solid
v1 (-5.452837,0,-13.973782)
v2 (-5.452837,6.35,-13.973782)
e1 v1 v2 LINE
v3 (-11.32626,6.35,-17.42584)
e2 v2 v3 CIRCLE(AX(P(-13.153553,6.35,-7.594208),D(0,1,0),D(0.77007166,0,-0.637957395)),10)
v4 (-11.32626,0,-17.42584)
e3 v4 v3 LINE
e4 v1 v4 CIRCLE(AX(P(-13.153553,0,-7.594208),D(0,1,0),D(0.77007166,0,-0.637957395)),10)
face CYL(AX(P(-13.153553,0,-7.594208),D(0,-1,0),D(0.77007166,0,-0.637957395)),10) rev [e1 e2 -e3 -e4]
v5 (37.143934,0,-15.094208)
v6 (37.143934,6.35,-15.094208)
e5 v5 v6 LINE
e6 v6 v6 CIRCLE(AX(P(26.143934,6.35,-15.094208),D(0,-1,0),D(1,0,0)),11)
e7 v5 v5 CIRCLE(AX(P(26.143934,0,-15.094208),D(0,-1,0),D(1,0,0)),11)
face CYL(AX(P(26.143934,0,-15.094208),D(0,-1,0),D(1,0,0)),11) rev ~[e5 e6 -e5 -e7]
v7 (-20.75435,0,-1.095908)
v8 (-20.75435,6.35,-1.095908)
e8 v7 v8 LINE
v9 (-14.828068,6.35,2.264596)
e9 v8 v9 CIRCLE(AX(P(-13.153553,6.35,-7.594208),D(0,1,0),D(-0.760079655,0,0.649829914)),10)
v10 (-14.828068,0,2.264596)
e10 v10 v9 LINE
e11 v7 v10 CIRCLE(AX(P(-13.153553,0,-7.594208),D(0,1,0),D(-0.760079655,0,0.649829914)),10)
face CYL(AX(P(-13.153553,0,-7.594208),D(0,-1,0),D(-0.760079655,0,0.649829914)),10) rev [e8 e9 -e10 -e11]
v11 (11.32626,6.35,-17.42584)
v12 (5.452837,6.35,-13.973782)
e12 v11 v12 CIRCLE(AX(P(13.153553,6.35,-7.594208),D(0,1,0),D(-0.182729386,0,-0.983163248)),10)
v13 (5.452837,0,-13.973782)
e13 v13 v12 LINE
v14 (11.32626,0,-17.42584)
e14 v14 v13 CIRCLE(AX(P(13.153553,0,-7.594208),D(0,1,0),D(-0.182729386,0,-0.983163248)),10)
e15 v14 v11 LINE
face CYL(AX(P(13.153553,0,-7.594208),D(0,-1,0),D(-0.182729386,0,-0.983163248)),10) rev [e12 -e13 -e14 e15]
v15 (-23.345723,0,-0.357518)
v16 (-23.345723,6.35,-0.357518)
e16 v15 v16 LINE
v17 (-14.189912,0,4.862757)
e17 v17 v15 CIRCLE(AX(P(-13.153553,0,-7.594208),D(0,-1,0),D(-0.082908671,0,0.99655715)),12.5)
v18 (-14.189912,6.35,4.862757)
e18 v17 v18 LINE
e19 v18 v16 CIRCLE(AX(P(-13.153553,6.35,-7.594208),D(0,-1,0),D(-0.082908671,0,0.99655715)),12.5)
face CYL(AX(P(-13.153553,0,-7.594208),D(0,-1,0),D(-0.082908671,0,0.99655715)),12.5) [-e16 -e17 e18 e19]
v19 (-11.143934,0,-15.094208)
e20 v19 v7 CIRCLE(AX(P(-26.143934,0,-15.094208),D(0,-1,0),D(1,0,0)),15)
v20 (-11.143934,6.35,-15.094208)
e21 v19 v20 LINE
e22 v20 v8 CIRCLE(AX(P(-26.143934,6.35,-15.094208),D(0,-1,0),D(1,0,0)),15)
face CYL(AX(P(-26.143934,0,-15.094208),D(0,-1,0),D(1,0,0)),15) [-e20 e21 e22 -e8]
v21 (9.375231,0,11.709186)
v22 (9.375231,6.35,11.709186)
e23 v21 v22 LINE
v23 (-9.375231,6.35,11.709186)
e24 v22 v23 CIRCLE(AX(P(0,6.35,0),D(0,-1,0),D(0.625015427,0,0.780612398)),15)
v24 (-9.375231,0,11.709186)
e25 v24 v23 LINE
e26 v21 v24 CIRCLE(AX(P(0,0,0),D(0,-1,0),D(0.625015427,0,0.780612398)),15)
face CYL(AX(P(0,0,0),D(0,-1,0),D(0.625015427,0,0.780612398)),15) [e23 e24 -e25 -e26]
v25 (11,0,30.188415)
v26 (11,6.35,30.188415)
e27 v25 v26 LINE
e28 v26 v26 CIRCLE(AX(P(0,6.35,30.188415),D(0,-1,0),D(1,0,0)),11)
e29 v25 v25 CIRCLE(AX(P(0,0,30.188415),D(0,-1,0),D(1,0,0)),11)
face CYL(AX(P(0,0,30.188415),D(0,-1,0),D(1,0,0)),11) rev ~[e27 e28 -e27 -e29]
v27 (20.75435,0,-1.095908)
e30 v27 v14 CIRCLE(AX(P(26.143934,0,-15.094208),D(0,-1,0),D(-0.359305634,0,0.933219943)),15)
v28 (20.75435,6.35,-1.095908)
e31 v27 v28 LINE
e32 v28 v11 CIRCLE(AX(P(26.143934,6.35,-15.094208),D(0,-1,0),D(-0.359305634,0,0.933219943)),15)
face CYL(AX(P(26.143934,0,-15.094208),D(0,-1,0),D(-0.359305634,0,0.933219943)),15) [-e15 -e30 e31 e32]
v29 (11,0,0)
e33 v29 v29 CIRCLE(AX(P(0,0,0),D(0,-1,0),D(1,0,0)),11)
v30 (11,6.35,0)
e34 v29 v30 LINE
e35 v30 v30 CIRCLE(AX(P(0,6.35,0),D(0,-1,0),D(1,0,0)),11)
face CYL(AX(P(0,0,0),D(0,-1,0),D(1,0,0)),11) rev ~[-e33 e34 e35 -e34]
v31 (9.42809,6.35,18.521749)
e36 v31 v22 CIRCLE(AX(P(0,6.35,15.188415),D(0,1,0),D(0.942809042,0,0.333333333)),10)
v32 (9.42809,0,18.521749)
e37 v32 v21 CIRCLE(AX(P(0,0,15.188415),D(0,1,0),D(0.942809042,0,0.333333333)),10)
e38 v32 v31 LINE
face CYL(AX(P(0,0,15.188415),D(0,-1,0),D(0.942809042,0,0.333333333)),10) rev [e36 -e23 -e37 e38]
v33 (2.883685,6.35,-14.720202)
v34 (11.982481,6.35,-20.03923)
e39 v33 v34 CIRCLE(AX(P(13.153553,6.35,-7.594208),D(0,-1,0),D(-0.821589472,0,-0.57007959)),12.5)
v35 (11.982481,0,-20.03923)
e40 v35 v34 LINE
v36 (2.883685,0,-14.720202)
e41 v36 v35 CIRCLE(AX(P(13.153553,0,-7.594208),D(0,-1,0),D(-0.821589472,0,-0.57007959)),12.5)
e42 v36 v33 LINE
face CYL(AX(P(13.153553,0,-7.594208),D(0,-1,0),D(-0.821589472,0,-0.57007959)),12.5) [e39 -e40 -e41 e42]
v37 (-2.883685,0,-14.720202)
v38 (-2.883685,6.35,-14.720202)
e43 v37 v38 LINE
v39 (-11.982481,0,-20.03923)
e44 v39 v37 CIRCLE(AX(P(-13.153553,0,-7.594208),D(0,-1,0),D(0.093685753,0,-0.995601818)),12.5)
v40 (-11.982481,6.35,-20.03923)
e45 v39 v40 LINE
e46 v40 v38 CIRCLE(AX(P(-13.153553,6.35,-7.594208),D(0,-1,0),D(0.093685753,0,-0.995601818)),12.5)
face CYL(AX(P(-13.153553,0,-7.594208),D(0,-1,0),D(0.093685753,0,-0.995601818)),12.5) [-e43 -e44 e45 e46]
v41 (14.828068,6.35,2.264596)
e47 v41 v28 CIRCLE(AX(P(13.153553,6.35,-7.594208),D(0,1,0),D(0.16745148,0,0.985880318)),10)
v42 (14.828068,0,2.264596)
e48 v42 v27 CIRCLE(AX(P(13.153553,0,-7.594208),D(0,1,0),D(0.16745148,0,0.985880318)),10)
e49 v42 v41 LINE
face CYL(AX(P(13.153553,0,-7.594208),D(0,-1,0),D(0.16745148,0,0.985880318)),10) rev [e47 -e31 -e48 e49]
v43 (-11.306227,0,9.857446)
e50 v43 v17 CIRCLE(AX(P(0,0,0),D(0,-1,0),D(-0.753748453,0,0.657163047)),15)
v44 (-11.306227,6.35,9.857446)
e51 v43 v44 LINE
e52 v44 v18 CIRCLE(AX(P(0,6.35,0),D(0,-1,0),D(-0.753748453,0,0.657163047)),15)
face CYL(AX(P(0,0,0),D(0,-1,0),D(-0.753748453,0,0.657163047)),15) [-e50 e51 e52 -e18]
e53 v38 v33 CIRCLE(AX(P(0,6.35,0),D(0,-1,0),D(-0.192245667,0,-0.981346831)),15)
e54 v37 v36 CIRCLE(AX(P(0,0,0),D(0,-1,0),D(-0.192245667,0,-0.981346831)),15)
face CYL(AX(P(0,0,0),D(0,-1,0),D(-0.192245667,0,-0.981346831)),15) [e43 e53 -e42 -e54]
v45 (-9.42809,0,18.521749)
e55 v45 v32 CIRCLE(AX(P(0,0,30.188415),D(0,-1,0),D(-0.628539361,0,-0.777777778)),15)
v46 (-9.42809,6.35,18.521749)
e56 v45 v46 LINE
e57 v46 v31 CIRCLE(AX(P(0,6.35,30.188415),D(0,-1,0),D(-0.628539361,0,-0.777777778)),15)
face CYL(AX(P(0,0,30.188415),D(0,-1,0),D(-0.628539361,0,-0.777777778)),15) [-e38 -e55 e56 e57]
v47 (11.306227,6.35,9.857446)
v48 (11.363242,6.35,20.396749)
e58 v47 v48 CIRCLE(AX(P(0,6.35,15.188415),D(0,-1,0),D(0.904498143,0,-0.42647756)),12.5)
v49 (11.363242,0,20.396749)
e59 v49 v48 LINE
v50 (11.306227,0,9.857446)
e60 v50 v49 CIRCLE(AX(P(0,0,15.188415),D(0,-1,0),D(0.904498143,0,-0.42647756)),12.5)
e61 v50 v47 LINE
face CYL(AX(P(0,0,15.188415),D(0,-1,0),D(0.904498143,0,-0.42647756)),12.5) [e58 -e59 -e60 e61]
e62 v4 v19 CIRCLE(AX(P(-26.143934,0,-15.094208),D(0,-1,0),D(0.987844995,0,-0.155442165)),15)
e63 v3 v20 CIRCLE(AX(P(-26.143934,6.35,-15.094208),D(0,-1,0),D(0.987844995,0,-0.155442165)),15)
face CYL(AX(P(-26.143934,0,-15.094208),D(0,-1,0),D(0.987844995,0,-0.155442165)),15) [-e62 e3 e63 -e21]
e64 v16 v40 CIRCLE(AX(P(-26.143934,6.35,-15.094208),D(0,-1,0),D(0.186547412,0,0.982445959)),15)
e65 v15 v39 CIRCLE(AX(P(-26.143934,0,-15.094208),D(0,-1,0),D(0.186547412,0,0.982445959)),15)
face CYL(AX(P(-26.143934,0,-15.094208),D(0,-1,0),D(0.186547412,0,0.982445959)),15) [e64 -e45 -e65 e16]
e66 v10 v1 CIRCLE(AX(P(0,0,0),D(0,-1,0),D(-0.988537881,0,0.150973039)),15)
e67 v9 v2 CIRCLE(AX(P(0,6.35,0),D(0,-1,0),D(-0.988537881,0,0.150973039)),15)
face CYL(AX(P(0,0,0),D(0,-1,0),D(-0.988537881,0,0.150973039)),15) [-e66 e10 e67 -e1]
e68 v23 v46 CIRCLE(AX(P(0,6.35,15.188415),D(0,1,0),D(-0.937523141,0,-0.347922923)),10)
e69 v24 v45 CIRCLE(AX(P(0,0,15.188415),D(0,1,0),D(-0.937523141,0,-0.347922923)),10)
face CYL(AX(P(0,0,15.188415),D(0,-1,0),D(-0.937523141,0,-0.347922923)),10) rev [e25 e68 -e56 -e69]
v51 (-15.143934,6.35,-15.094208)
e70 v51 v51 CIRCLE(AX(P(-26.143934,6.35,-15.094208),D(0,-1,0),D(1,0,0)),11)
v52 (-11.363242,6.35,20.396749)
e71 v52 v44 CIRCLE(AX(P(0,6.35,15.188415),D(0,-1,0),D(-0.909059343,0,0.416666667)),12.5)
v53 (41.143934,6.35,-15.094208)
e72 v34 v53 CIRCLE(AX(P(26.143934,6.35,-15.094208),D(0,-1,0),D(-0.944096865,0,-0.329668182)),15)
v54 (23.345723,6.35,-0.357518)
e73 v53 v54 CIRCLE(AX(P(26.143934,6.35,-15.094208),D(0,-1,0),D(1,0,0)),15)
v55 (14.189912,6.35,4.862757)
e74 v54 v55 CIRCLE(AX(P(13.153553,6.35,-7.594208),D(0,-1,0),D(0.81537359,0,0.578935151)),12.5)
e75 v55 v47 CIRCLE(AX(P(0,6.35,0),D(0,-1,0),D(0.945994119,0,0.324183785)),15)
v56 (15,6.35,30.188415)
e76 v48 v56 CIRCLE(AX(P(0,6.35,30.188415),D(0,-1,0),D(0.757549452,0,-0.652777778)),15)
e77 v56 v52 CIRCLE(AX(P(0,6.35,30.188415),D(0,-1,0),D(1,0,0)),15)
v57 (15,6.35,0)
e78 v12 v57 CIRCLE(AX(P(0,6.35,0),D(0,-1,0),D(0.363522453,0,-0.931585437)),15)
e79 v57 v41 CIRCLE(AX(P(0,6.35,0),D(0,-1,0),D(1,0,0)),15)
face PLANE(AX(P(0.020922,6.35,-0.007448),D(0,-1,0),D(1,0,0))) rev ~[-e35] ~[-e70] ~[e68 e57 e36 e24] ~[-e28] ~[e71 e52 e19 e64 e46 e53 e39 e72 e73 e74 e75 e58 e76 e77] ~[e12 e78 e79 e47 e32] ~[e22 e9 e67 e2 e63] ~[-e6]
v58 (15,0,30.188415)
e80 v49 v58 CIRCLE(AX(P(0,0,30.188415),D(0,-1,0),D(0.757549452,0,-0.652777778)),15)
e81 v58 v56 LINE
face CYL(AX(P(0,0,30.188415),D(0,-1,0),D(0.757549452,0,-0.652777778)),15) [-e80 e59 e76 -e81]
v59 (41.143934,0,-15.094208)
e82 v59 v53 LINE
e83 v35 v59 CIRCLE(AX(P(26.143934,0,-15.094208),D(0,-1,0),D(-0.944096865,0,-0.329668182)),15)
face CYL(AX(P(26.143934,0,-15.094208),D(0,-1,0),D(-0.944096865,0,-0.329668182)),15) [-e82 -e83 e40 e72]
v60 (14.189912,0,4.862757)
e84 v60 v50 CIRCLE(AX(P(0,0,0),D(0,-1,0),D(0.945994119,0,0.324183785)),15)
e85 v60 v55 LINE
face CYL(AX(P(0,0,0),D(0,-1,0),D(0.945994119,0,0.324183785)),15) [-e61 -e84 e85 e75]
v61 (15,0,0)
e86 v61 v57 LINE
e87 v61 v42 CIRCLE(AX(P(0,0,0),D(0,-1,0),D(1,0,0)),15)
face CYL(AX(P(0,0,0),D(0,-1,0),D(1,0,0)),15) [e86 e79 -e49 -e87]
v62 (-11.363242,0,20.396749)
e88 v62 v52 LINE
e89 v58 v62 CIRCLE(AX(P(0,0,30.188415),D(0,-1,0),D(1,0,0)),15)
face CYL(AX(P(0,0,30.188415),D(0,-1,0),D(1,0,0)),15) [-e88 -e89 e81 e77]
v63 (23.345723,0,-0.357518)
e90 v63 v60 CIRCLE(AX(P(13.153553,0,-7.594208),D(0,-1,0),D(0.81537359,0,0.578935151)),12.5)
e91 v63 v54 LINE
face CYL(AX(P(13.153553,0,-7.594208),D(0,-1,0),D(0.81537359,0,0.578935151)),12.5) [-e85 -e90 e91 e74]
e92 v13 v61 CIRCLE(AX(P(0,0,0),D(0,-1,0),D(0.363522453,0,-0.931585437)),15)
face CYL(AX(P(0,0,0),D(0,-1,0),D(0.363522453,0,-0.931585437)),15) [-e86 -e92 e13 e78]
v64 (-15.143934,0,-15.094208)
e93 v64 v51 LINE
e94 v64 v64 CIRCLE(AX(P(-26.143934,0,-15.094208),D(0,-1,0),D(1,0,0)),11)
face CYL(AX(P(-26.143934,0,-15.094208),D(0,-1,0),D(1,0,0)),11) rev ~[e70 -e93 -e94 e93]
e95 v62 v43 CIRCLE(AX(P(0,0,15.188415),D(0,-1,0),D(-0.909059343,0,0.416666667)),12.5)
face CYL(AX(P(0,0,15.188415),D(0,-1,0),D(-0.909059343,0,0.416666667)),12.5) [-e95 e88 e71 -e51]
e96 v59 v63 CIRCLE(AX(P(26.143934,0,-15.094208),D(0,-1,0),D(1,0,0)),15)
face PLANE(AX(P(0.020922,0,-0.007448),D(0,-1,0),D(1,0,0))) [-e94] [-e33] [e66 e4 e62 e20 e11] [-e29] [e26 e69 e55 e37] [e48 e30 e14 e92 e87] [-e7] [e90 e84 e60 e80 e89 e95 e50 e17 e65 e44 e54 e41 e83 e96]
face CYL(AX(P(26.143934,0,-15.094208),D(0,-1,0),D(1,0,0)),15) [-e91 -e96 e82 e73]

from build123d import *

# Parameters (mm, degrees)
F0_R     = 11
F1_DEPTH = 6.35


# Not quite as in the source:
# - a length typed as a fraction of an inch, garbled in the dataset ("3 / 203.2 mm" for 3/8 in), is restored


with BuildPart() as f1:
    # F0 (on Front) → F1 (new body)
    with BuildSketch(Plane.XZ):
        with BuildLine():
            ThreePointArc((5.4528368022, -13.9737815501), (12.3853250267, -8.4618983676), (15, 0))
            ThreePointArc((15, 0), (14.956955291, 1.1355564373), (14.8280682104, 2.2645955817))
            ThreePointArc((14.8280682104, 2.2645955817), (14.5670313108, 3.5779321946), (14.1899117897, 4.8627567696))
            ThreePointArc((14.1899117897, 4.8627567696), (12.9903810568, 7.5), (11.3062267898, 9.8574457025))
            ThreePointArc((11.3062267898, 9.8574457025), (10.382095829, 10.8264530756), (9.3752314082, 11.7091859684))
            ThreePointArc((9.3752314082, 11.7091859684), (0, 15), (-9.3752314082, 11.7091859684))
            ThreePointArc((-9.3752314082, 11.7091859684), (-10.382095829, 10.8264530756), (-11.3062267898, 9.8574457025))
            ThreePointArc((-11.3062267898, 9.8574457025), (-12.9903810568, 7.5), (-14.1899117897, 4.8627567696))
            ThreePointArc((-14.1899117897, 4.8627567696), (-14.5670313108, 3.5779321946), (-14.8280682104, 2.2645955817))
            ThreePointArc((-14.8280682104, 2.2645955817), (-12.9903810568, -7.5), (-5.4528368022, -13.9737815501))
            ThreePointArc((-5.4528368022, -13.9737815501), (-4.1849354819, -14.4043852702), (-2.883685, -14.7202024721))
            ThreePointArc((-2.883685, -14.7202024721), (0, -15), (2.883685, -14.7202024721))
            ThreePointArc((2.883685, -14.7202024721), (4.1849354819, -14.4043852702), (5.4528368022, -13.9737815501))
        make_face()
        Circle(F0_R, mode=Mode.SUBTRACT)
        with BuildLine():
            ThreePointArc((14.1899117897, 4.8627567696), (14.5670313108, 3.5779321946), (14.8280682104, 2.2645955817))
            ThreePointArc((14.8280682104, 2.2645955817), (18.0862095917, 1.1045798418), (20.7543499599, -1.0959084571))
            ThreePointArc((20.7543499599, -1.0959084571), (22.0334229862, -0.6684079546), (23.3457232771, -0.3575182103))
            ThreePointArc((23.3457232771, -0.3575182103), (19.3449005461, 3.2647619918), (14.1899117897, 4.8627567696))
        make_face()
        with BuildLine():
            ThreePointArc((11.326259544, -17.4258400757), (8.0865105924, -16.2154068855), (5.4528368022, -13.9737815501))
            ThreePointArc((5.4528368022, -13.9737815501), (4.1849354819, -14.4043852702), (2.883685, -14.7202024721))
            ThreePointArc((2.883685, -14.7202024722), (6.8450834508, -18.3855563025), (11.982481491, -20.0392303225))
            ThreePointArc((11.982481491, -20.0392303225), (11.5955697619, -18.7473000611), (11.326259544, -17.4258400757))
        make_face()
        with BuildLine():
            ThreePointArc((23.3457232771, -0.3575182103), (22.0334229862, -0.6684079546), (20.7543499599, -1.0959084571))
            ThreePointArc((20.7543499599, -1.0959084571), (13.153553406, -7.5942075998), (11.326259544, -17.4258400757))
            ThreePointArc((11.326259544, -17.4258400757), (11.5955697619, -18.7473000611), (11.982481491, -20.0392303225))
            ThreePointArc((11.982481491, -20.0392303225), (28.6517428111, -29.8830850855), (41.1439344628, -15.0942075998))
            ThreePointArc((41.1439344628, -15.0942075998), (35.7101989431, -3.5405681778), (23.3457232771, -0.3575182103))
        make_face()
        with Locations((26.1439344628, -15.0942075998)):
            Circle(F0_R, mode=Mode.SUBTRACT)
        with BuildLine():
            ThreePointArc((9.3752314082, 11.7091859684), (10.382095829, 10.8264530756), (11.3062267898, 9.8574457025))
            ThreePointArc((11.3062267898, 9.8574457025), (12.4998170953, 15.1207943107), (11.3632417861, 20.3967485329))
            ThreePointArc((11.3632417861, 20.3967485329), (10.4378532243, 19.4157080157), (9.4280904158, 18.5217485329))
            ThreePointArc((9.4280904158, 18.5217485329), (9.9996989994, 15.1108270437), (9.3752314082, 11.7091859684))
        make_face()
        with BuildLine():
            ThreePointArc((-11.982481491, -20.0392303225), (-6.8450834508, -18.3855563025), (-2.883685, -14.7202024722))
            ThreePointArc((-2.883685, -14.7202024721), (-4.1849354819, -14.4043852702), (-5.4528368022, -13.9737815501))
            ThreePointArc((-5.4528368022, -13.9737815501), (-8.0865105924, -16.2154068855), (-11.326259544, -17.4258400757))
            ThreePointArc((-11.326259544, -17.4258400757), (-11.5955697619, -18.7473000611), (-11.982481491, -20.0392303225))
        make_face()
        with BuildLine():
            ThreePointArc((9.4280904158, 18.5217485329), (10.4378532243, 19.4157080157), (11.3632417861, 20.3967485329))
            ThreePointArc((11.3632417861, 20.3967485329), (14.0614477703, 24.9658021941), (15, 30.1884151995))
            ThreePointArc((15, 30.1884151995), (-5.2226130054, 44.2498629698), (-11.3632417861, 20.3967485329))
            ThreePointArc((-11.3632417861, 20.3967485329), (-10.4378532243, 19.4157080157), (-9.4280904158, 18.5217485329))
            ThreePointArc((-9.4280904158, 18.5217485329), (0, 15.1884151995), (9.4280904158, 18.5217485329))
        make_face()
        with Locations((0, 30.1884151995)):
            Circle(F0_R, mode=Mode.SUBTRACT)
        with BuildLine():
            ThreePointArc((-23.3457232771, -0.3575182103), (-39.1343155195, -22.5942075998), (-11.982481491, -20.0392303225))
            ThreePointArc((-11.982481491, -20.0392303225), (-11.5955697619, -18.7473000611), (-11.326259544, -17.4258400757))
            ThreePointArc((-11.326259544, -17.4258400757), (-11.1895851994, -16.2635826934), (-11.1439344628, -15.0942075998))
            ThreePointArc((-11.1439344628, -15.0942075998), (-13.7777756504, -6.6043244305), (-20.7543499599, -1.0959084571))
            ThreePointArc((-20.7543499599, -1.0959084571), (-22.0334229862, -0.6684079546), (-23.3457232771, -0.3575182103))
        make_face()
        with Locations((-26.1439344628, -15.0942075998)):
            Circle(F0_R, mode=Mode.SUBTRACT)
        with BuildLine():
            ThreePointArc((-11.3062267898, 9.8574457025), (-10.382095829, 10.8264530756), (-9.3752314082, 11.7091859684))
            ThreePointArc((-9.3752314082, 11.7091859684), (-9.9996989994, 15.1108270437), (-9.4280904158, 18.5217485329))
            ThreePointArc((-9.4280904158, 18.5217485329), (-10.4378532243, 19.4157080157), (-11.3632417861, 20.3967485329))
            ThreePointArc((-11.3632417861, 20.3967485329), (-12.4998170953, 15.1207943107), (-11.3062267898, 9.8574457025))
        make_face()
        with BuildLine():
            ThreePointArc((-20.7543499599, -1.0959084571), (-18.0862095917, 1.1045798418), (-14.8280682104, 2.2645955817))
            ThreePointArc((-14.8280682104, 2.2645955817), (-14.5670313108, 3.5779321946), (-14.1899117897, 4.8627567696))
            ThreePointArc((-14.1899117897, 4.8627567696), (-19.3449005461, 3.2647619918), (-23.3457232771, -0.3575182103))
            ThreePointArc((-23.3457232771, -0.3575182103), (-22.0334229862, -0.6684079546), (-20.7543499599, -1.0959084571))
        make_face()
    extrude(amount=-F1_DEPTH)


solid = f1.part
